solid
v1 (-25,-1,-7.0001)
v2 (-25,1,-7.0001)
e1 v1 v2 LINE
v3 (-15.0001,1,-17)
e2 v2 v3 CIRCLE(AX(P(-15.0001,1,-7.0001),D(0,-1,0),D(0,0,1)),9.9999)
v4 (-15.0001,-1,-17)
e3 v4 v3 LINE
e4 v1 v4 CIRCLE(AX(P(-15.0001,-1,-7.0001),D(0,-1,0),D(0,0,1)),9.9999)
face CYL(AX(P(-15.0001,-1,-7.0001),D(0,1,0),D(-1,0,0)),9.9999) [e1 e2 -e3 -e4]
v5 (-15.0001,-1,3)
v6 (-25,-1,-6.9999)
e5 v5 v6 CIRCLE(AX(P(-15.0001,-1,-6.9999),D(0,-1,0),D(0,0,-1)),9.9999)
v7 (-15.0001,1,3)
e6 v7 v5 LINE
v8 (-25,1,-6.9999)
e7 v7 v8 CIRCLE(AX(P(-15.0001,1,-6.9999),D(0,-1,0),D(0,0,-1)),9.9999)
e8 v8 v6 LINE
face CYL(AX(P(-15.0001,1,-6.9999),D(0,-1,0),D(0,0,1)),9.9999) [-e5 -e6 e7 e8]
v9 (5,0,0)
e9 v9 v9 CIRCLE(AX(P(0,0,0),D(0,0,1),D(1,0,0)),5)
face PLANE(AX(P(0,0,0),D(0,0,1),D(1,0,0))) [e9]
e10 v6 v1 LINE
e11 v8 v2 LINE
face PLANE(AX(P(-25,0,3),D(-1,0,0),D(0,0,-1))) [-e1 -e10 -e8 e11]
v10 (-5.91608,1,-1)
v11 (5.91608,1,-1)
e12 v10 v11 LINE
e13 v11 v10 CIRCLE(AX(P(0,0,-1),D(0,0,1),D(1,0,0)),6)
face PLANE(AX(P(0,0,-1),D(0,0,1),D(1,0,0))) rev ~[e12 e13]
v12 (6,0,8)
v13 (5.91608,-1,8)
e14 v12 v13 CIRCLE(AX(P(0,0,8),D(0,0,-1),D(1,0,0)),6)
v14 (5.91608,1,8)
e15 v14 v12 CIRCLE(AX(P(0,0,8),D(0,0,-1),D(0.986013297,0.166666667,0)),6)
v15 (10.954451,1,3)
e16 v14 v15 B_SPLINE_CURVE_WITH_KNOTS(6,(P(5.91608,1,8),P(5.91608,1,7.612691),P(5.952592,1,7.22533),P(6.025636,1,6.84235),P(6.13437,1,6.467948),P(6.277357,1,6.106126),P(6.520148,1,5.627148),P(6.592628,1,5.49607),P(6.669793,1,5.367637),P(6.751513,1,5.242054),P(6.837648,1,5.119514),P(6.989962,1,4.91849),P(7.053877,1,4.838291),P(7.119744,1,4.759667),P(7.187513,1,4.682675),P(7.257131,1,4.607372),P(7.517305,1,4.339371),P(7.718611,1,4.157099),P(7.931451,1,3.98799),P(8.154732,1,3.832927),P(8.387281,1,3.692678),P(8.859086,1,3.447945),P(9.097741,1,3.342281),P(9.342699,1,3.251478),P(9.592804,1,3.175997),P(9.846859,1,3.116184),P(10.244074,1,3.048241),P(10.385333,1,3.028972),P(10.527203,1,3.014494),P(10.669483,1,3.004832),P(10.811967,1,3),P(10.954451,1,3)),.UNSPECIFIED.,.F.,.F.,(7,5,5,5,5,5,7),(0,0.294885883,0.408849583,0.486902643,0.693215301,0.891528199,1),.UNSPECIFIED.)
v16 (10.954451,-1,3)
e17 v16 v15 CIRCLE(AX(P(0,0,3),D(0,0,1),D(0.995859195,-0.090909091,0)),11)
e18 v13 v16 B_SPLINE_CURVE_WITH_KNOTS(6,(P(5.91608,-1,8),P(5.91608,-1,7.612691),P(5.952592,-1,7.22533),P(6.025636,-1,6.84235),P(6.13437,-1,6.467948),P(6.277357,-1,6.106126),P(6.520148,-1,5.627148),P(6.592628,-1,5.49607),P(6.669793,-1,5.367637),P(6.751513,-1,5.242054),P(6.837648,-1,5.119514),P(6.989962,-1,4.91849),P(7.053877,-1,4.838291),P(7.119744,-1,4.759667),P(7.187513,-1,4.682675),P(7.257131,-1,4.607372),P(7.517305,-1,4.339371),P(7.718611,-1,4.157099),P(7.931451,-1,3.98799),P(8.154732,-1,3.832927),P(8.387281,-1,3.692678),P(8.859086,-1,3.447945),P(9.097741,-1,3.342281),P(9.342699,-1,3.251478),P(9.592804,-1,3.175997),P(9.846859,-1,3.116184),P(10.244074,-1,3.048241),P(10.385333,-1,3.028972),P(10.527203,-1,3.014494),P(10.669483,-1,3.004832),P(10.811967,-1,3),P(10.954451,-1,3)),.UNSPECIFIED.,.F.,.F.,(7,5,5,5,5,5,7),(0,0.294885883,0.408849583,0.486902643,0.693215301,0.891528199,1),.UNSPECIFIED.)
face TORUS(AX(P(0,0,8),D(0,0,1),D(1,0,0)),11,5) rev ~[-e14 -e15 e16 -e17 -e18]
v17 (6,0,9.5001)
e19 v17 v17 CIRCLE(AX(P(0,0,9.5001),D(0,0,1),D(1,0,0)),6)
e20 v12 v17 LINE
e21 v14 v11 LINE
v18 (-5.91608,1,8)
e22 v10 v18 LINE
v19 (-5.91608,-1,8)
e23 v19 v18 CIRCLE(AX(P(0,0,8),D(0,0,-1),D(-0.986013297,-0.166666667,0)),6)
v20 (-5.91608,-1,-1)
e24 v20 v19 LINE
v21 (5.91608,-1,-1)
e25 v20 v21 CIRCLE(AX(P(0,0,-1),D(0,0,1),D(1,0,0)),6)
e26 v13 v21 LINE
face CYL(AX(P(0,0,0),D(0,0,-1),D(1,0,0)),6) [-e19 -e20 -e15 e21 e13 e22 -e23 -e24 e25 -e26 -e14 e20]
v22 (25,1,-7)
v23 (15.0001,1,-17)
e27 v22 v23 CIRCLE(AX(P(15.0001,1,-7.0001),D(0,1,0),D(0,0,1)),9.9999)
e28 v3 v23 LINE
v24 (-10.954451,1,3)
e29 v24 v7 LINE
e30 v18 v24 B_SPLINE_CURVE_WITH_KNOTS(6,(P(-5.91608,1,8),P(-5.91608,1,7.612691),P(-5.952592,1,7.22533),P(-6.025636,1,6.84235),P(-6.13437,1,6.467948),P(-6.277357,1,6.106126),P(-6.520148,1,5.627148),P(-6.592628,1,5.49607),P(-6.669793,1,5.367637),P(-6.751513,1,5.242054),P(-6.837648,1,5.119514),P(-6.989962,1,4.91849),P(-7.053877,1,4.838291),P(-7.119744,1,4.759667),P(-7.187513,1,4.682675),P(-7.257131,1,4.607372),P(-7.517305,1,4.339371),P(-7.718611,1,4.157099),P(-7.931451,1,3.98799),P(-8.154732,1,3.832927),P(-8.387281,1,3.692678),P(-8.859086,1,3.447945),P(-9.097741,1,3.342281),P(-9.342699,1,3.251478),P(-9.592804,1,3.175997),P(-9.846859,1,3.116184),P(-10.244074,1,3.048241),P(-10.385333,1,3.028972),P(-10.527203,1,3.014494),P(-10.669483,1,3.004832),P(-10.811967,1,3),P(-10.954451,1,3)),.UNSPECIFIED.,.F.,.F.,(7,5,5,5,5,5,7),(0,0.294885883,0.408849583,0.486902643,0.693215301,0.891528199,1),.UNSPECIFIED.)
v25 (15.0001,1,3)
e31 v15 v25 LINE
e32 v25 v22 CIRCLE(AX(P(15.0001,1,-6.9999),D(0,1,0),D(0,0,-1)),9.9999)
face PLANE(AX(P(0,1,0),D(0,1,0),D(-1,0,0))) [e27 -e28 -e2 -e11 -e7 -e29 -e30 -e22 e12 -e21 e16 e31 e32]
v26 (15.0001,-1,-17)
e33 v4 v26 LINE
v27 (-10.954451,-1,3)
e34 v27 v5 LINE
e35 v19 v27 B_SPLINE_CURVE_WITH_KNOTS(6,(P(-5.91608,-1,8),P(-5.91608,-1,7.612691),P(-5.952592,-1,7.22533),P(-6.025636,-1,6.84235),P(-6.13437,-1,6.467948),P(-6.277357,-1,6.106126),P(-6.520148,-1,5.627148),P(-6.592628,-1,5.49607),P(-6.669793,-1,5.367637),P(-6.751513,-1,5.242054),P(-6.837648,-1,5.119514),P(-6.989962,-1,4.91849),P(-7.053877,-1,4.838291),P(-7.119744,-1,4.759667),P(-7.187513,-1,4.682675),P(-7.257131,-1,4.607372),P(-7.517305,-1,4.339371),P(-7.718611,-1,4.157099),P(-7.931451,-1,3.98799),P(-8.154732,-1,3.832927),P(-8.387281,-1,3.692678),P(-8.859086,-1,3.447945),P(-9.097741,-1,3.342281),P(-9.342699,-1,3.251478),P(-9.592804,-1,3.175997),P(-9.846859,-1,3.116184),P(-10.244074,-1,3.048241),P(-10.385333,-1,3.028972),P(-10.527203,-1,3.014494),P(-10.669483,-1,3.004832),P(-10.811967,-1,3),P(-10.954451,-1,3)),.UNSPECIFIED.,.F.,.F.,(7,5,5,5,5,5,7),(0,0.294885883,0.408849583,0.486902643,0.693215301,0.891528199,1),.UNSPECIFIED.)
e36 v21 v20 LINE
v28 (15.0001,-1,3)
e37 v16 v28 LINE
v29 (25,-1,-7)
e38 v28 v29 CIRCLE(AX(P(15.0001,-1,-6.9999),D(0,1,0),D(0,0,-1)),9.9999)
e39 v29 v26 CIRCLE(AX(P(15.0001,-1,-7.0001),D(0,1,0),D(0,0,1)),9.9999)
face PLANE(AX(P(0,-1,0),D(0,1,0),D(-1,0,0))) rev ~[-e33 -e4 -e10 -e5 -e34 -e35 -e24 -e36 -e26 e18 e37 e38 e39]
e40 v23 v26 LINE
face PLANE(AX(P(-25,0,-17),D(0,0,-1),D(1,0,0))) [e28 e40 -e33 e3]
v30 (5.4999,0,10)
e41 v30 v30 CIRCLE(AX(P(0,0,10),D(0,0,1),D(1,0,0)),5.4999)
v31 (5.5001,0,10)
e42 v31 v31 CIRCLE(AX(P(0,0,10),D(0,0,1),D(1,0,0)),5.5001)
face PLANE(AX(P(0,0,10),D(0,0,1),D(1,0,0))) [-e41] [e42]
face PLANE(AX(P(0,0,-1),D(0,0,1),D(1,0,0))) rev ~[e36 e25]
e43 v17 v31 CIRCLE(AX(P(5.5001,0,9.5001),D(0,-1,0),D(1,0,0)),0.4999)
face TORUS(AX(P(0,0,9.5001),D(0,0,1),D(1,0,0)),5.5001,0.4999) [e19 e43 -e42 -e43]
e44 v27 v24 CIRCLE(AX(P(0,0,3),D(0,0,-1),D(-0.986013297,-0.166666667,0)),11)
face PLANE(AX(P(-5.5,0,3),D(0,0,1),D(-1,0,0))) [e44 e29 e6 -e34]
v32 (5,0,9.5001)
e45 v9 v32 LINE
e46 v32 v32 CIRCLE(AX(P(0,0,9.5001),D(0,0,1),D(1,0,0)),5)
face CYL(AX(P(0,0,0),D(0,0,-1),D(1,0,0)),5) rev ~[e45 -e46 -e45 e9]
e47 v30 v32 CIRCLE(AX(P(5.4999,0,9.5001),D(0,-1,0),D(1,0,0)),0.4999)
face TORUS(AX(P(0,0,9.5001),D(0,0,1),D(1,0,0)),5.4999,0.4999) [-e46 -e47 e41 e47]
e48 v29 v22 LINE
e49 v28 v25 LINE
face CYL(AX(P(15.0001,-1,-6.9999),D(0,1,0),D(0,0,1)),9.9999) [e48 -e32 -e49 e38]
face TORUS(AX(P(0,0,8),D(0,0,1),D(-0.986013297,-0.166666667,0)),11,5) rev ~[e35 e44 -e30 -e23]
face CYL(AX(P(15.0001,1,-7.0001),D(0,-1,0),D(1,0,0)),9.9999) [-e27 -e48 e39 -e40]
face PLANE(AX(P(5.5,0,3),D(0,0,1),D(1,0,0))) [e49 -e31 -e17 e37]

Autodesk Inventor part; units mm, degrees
ref_plane "YZ Plane" through (0, 0, 0) normal (1, 0, 0) x (0, 1, 0)
ref_plane "XZ Plane" through (0, 0, 0) normal (0, 1, 0) x (-1, 0, 0)
ref_plane "XY Plane" through (0, 0, 0) normal (0, 0, 1) x (1, 0, 0)
sketch "Szkic1" plane through (0, 0, 0) normal (0, 0, 1) x (1, 0, 0)
  circle A0 centre (0, 0) radius 3 projected
  circle A1 centre (0, 0) radius 6
  point P0 (0, 0)
  dimension "d0" = 12
extrude "Wyciągnięcie proste1" add sketch "Szkic1" against normal blind 1 contours A0 | A1
sketch "Szkic2" plane through (0, 0, 0) normal (0, 0, 1) x (1, 0, 0)
  circle A0 centre (0, 0) radius 6 projected
  circle A1 centre (0, 0) radius 5
  point P0 (0, 0)
  dimension "d3" = 1
extrude "Wyciągnięcie proste2" add sketch "Szkic2" along normal blind 10
full round fillet "Zaokrąglenie1" first side at (4.9353, -0.8021, 6.6667) centre faces at (5.6086, -0.4786, 10) second side at (5.9223, -0.9625, 2.6667)
sketch "Szkic3" plane through (0, 0, 0) normal (0, 1, 0) x (-1, 0, 0)
  line L0 (-6, -1) -> (6, -1) projected
  line L1 (6, 9.5) -> (-6, 9.5) projected
  line L2 (0, 3) -> (25, 3)
  line L3 (25, 3) -> (25, -17)
  line L4 (25, -17) -> (0, -17)
  line L5 (0, -17) -> (0, 3)
  line L6 (0, 3) -> (5.5, 3)
  line L7 (5.5, 3) -> (5.5, -1)
  line L8 (5.5, -1) -> (0, -1)
  line L9 (0, -1) -> (0, 3)
  point P0 (0, 0)
  point P1 (5.5, -1)
  point P2 (0, -1)
  dimension "d6" = 25
  dimension "d7" = 20
  dimension "d8" = 5.5
  dimension "d9" = 4
extrude "Wyciągnięcie proste3" add sketch "Szkic3" along normal mid plane 2 contours L0 L7 L2 L3 L4 L5
fillet "Zaokrąglenie2" radius 5 1 edges at (-6, 0, 3)
full round fillet "Zaokrąglenie3" first side at (-20.3316, -0.1112, 3) centre faces at (-25, 0.3333, -10.3333) second side at (-8.3333, -0.3333, -17)
pattern_circular "Szyk kołowy1" count 2 over 360 about axis through (0, 0, 0) along (0, 0, 1) of "Wyciągnięcie proste3", "Zaokrąglenie2", "Zaokrąglenie3"
properties part number "raczka" material "Aluminium 6061"
